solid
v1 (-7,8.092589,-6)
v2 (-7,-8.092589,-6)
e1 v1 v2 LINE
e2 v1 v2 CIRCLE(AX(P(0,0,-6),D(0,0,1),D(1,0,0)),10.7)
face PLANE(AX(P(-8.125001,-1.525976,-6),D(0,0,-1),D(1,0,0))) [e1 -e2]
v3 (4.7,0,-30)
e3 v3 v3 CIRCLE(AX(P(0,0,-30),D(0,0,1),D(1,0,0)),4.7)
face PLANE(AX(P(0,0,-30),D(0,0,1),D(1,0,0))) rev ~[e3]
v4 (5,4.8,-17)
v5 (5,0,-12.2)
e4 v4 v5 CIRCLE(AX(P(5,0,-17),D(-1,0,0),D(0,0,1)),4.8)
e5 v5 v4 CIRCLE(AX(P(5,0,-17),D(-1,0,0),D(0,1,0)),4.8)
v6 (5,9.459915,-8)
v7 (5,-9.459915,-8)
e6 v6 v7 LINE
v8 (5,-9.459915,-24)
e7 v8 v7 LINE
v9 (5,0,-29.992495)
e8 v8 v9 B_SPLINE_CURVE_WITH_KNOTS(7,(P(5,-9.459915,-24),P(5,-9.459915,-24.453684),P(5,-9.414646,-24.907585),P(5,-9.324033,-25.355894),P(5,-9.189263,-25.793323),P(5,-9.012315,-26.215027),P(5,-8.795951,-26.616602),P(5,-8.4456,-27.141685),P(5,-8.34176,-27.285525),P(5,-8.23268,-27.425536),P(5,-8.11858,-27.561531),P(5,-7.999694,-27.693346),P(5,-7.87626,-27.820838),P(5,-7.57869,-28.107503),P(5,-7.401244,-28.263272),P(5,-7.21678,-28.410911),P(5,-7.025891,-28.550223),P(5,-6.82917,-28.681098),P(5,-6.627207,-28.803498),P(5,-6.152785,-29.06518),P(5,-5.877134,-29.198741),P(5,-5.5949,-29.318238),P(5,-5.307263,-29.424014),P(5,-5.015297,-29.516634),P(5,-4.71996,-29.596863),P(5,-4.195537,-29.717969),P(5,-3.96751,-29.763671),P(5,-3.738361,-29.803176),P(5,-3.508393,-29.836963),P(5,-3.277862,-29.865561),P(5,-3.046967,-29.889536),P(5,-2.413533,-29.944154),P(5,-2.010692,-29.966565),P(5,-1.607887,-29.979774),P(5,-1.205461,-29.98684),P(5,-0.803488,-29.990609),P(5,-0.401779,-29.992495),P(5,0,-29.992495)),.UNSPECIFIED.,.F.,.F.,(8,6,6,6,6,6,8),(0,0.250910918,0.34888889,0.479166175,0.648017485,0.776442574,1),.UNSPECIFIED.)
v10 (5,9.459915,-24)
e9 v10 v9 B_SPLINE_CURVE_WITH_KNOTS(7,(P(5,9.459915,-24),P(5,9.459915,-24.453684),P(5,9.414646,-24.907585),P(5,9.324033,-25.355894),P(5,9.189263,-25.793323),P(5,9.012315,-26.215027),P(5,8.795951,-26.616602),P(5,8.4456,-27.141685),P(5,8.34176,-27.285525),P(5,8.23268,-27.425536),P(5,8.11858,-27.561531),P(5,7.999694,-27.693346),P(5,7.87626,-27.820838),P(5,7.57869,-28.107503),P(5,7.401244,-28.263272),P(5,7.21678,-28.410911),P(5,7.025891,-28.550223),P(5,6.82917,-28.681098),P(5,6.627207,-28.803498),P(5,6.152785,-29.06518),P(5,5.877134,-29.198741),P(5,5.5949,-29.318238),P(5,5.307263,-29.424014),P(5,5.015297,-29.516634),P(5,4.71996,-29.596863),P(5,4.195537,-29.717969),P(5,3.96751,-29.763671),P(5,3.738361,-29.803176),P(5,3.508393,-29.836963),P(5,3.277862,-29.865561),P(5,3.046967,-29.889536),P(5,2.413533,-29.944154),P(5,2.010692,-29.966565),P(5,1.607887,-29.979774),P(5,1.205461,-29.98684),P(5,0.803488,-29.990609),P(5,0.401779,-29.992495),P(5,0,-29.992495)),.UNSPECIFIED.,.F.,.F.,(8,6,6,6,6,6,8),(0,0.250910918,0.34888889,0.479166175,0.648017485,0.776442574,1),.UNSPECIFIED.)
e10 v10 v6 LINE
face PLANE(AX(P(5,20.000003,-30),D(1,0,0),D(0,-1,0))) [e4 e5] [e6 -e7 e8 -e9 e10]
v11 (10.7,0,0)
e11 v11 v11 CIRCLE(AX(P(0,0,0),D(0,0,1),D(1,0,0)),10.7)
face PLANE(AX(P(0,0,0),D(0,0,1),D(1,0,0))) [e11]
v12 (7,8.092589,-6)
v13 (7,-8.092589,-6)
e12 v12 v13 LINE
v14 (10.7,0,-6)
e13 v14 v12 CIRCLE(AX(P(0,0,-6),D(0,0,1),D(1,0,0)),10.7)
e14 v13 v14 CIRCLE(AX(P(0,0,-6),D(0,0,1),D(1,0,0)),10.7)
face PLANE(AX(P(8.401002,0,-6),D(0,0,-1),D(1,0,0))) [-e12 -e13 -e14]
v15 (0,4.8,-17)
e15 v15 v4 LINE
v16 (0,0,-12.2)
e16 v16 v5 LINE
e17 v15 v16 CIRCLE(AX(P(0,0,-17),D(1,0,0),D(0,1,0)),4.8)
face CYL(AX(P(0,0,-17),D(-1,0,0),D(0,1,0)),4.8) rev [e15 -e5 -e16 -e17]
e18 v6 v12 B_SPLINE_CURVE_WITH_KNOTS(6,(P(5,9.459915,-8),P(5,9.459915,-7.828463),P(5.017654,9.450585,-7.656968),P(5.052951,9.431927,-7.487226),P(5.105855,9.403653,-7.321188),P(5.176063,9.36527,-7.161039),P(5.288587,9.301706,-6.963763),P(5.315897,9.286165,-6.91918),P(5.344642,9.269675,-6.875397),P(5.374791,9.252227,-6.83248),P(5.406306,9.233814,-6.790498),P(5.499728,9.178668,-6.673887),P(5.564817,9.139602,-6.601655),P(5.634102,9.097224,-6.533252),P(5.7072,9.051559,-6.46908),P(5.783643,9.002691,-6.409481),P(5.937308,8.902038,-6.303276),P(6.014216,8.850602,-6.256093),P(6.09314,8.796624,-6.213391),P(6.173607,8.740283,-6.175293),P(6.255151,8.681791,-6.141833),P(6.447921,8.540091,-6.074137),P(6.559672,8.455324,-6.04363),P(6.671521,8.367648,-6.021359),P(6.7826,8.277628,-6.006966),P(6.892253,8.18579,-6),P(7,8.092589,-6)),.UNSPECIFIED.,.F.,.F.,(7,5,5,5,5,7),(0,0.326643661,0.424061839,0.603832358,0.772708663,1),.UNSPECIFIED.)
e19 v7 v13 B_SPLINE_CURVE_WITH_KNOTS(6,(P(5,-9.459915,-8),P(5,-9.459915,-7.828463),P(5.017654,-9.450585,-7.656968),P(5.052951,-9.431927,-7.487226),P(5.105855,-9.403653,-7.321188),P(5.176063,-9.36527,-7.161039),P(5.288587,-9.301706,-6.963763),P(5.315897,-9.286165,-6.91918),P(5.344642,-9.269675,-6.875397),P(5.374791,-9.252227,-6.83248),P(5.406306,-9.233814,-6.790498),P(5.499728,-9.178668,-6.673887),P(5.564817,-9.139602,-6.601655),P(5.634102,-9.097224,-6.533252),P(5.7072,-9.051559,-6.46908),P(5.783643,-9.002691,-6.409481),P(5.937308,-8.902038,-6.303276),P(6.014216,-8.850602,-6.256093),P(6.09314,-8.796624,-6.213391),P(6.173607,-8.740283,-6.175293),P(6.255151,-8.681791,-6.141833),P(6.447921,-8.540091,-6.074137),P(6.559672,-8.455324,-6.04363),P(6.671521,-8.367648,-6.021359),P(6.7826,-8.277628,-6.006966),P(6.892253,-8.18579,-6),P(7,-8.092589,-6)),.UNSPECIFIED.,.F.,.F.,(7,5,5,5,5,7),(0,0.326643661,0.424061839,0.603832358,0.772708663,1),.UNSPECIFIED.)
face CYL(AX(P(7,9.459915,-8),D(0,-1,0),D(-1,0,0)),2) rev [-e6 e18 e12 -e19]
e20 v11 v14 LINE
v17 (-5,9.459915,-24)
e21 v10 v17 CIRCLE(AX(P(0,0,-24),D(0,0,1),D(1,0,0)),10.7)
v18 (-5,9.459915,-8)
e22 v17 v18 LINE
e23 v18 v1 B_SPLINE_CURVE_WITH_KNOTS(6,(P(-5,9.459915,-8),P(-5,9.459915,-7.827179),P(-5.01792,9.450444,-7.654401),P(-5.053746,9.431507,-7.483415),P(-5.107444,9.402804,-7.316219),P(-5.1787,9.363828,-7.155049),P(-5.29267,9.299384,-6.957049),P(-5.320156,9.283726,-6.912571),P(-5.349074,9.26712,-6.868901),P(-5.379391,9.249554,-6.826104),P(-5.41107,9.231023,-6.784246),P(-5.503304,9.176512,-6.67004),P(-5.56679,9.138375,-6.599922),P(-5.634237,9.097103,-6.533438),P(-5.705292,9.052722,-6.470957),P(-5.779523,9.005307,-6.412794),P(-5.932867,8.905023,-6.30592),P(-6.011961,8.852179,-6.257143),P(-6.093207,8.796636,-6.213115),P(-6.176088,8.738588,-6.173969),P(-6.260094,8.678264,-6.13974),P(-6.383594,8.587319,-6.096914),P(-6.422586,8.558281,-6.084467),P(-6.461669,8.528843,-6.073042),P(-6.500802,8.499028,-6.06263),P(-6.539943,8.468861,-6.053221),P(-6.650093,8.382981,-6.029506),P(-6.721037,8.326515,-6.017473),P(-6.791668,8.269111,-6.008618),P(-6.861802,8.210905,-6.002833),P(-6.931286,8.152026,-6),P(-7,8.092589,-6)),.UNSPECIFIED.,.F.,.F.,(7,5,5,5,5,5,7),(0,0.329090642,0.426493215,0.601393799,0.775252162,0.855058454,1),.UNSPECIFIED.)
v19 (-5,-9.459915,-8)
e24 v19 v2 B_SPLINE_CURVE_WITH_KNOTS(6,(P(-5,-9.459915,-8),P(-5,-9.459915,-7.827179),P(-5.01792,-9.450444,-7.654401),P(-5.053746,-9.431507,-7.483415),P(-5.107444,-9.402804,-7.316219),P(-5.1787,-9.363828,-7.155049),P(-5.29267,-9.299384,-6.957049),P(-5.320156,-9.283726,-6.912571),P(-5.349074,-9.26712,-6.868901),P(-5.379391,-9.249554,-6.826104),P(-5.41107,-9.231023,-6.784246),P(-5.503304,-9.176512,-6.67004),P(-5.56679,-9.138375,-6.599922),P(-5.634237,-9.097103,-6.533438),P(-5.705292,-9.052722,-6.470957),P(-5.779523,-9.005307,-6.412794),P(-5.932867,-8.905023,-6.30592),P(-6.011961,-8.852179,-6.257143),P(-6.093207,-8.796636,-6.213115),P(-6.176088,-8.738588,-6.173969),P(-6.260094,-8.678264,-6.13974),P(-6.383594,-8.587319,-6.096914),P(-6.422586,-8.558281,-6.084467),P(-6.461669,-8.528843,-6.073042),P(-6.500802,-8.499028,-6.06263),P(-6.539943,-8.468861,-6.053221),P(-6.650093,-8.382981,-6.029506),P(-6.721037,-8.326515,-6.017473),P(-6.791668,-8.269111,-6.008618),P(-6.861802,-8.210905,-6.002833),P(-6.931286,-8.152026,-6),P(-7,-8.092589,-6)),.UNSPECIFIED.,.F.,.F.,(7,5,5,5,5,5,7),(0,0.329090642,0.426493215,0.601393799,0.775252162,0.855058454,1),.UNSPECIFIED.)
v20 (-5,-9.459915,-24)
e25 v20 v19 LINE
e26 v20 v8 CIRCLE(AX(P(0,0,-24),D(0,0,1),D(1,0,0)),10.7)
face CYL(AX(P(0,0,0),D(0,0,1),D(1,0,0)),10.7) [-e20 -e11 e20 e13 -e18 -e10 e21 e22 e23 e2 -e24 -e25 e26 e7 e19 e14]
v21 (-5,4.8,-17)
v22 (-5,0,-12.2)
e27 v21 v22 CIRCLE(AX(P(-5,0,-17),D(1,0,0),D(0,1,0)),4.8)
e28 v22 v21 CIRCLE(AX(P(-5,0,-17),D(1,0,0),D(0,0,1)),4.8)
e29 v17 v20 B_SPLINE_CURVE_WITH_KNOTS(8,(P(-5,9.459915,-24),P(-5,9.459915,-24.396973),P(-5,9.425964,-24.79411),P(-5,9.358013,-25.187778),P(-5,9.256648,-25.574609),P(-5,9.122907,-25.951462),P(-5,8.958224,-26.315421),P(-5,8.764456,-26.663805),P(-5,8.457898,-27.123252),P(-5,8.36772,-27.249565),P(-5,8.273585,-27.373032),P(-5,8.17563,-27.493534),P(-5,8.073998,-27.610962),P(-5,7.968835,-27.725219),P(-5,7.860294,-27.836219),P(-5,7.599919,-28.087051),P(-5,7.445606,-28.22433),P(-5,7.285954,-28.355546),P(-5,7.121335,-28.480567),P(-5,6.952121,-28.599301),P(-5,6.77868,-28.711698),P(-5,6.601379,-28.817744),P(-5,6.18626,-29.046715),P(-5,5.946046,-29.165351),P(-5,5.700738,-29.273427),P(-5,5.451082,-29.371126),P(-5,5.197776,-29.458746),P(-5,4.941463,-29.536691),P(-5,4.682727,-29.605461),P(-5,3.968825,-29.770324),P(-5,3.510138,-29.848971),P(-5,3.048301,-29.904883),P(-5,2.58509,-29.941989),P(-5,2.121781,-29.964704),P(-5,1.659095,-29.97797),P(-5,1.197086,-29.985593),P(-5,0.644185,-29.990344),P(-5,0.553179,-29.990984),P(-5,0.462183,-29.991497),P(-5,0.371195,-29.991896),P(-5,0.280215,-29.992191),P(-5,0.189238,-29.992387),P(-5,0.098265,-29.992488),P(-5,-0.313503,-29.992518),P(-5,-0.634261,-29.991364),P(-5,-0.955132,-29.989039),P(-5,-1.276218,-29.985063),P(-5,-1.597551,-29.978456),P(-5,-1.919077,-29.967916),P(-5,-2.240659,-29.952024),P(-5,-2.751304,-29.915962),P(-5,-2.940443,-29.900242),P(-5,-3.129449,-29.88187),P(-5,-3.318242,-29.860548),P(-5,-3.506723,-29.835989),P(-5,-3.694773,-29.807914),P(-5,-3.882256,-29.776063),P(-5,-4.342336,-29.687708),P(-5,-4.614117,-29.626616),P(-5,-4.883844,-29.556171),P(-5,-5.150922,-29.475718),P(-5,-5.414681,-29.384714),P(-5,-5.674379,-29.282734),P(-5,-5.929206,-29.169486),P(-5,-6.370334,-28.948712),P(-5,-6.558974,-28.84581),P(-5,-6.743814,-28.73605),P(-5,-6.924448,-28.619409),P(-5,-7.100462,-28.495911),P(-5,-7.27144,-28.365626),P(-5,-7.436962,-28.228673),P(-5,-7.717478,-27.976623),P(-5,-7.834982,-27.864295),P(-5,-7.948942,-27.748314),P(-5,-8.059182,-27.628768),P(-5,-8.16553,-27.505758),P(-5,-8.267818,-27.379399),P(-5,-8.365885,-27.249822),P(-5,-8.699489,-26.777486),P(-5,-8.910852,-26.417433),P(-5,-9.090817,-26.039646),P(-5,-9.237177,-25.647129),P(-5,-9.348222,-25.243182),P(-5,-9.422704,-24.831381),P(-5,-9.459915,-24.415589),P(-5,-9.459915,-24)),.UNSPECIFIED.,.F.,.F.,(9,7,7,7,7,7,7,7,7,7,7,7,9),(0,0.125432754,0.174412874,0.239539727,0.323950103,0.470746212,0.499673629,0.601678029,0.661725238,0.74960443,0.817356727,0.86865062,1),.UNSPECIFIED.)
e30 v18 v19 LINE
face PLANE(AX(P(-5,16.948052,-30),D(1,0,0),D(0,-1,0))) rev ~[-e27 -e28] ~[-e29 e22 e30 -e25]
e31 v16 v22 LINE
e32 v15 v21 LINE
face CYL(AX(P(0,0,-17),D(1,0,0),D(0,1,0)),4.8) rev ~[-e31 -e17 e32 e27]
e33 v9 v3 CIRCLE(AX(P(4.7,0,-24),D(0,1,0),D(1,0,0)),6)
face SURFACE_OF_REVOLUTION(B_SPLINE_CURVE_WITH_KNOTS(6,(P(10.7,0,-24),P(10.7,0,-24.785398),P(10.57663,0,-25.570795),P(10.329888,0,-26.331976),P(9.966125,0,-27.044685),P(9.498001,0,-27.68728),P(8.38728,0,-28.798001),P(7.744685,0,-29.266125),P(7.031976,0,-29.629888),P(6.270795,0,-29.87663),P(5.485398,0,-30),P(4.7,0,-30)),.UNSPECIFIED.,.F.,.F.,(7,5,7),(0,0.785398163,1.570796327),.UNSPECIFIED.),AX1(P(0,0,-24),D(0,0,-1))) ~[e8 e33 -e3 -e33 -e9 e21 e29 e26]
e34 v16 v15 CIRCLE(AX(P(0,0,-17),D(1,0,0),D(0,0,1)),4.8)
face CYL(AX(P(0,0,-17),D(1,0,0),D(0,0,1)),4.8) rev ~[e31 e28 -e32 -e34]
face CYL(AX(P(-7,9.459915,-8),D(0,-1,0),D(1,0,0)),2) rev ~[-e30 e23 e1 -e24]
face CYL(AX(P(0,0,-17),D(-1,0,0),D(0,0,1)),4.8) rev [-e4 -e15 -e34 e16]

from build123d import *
from build123d import SkipClean  # not in build123d's __all__

# Parameters (mm, degrees)
F0_R     = 10.7
F1_DEPTH = 30
F2_R     = 6
F4_DEPTH = 10.701
F5_DEPTH = 10.7010001
F6_W     = 6.2500013784
F6_H     = 36.9480545221
F6_W_2   = 6.8020046502
F6_H_2   = 40.0000055429
F7_DEPTH = 24
F8_R     = 2


# Not quite as in the source:
# - after a boolean that leaves OpenCascade's solid faulty, fix() repairs it


with BuildPart() as f1:
    # F0 (on Top) → F1 (new body)
    with BuildSketch(Plane.XY):
        Circle(F0_R)
    extrude(amount=-F1_DEPTH)

    # F2
    f2_edges = [f1.edges().sort_by_distance(p)[0] for p in [
        (-10.7, 0, -30),
    ]]
    fillet(f2_edges, radius=F2_R)

    # F3 (on Right) → F4 (cut, through all)
    with BuildSketch(Plane.YZ):
        with BuildLine():
            ThreePointArc((0, -12.2), (-3.3941125497, -20.3941125497), (4.8, -17))
            ThreePointArc((4.8, -17), (3.3941125497, -13.6058874503), (0, -12.2))
        make_face()
    extrude(amount=-F4_DEPTH, mode=Mode.SUBTRACT)

    # F5 (cut, through all): a face of the model
    f5_faces = [f1.faces().sort_by_distance(p)[0] for p in [
        (0, 0, -17),
    ]]
    with SkipClean():  # cleaning this boolean's faces spoils the solid; the shape is the same uncleaned
        extrude(f5_faces, amount=-F5_DEPTH, mode=Mode.SUBTRACT)

    # F6 (on face) → F7 (cut)
    with BuildSketch(Plane(origin=(0, 0, -30), x_dir=(1, 0, 0), z_dir=(0, 0, -1))):
        with Locations((-8.1250006892, 1.5259755104)):
            Rectangle(F6_W, F6_H)
        with Locations((8.4010023251, 0)):
            Rectangle(F6_W_2, F6_H_2)
    extrude(amount=-F7_DEPTH, mode=Mode.SUBTRACT)

    add(f1.part.fix(), mode=Mode.REPLACE)

    # F8
    f8_edges = [f1.edges().sort_by_distance(p)[0] for p in [
        (-5, 0, -6),
        (5, 0, -6),
    ]]
    fillet(f8_edges, radius=F8_R)


solid = f1.part
